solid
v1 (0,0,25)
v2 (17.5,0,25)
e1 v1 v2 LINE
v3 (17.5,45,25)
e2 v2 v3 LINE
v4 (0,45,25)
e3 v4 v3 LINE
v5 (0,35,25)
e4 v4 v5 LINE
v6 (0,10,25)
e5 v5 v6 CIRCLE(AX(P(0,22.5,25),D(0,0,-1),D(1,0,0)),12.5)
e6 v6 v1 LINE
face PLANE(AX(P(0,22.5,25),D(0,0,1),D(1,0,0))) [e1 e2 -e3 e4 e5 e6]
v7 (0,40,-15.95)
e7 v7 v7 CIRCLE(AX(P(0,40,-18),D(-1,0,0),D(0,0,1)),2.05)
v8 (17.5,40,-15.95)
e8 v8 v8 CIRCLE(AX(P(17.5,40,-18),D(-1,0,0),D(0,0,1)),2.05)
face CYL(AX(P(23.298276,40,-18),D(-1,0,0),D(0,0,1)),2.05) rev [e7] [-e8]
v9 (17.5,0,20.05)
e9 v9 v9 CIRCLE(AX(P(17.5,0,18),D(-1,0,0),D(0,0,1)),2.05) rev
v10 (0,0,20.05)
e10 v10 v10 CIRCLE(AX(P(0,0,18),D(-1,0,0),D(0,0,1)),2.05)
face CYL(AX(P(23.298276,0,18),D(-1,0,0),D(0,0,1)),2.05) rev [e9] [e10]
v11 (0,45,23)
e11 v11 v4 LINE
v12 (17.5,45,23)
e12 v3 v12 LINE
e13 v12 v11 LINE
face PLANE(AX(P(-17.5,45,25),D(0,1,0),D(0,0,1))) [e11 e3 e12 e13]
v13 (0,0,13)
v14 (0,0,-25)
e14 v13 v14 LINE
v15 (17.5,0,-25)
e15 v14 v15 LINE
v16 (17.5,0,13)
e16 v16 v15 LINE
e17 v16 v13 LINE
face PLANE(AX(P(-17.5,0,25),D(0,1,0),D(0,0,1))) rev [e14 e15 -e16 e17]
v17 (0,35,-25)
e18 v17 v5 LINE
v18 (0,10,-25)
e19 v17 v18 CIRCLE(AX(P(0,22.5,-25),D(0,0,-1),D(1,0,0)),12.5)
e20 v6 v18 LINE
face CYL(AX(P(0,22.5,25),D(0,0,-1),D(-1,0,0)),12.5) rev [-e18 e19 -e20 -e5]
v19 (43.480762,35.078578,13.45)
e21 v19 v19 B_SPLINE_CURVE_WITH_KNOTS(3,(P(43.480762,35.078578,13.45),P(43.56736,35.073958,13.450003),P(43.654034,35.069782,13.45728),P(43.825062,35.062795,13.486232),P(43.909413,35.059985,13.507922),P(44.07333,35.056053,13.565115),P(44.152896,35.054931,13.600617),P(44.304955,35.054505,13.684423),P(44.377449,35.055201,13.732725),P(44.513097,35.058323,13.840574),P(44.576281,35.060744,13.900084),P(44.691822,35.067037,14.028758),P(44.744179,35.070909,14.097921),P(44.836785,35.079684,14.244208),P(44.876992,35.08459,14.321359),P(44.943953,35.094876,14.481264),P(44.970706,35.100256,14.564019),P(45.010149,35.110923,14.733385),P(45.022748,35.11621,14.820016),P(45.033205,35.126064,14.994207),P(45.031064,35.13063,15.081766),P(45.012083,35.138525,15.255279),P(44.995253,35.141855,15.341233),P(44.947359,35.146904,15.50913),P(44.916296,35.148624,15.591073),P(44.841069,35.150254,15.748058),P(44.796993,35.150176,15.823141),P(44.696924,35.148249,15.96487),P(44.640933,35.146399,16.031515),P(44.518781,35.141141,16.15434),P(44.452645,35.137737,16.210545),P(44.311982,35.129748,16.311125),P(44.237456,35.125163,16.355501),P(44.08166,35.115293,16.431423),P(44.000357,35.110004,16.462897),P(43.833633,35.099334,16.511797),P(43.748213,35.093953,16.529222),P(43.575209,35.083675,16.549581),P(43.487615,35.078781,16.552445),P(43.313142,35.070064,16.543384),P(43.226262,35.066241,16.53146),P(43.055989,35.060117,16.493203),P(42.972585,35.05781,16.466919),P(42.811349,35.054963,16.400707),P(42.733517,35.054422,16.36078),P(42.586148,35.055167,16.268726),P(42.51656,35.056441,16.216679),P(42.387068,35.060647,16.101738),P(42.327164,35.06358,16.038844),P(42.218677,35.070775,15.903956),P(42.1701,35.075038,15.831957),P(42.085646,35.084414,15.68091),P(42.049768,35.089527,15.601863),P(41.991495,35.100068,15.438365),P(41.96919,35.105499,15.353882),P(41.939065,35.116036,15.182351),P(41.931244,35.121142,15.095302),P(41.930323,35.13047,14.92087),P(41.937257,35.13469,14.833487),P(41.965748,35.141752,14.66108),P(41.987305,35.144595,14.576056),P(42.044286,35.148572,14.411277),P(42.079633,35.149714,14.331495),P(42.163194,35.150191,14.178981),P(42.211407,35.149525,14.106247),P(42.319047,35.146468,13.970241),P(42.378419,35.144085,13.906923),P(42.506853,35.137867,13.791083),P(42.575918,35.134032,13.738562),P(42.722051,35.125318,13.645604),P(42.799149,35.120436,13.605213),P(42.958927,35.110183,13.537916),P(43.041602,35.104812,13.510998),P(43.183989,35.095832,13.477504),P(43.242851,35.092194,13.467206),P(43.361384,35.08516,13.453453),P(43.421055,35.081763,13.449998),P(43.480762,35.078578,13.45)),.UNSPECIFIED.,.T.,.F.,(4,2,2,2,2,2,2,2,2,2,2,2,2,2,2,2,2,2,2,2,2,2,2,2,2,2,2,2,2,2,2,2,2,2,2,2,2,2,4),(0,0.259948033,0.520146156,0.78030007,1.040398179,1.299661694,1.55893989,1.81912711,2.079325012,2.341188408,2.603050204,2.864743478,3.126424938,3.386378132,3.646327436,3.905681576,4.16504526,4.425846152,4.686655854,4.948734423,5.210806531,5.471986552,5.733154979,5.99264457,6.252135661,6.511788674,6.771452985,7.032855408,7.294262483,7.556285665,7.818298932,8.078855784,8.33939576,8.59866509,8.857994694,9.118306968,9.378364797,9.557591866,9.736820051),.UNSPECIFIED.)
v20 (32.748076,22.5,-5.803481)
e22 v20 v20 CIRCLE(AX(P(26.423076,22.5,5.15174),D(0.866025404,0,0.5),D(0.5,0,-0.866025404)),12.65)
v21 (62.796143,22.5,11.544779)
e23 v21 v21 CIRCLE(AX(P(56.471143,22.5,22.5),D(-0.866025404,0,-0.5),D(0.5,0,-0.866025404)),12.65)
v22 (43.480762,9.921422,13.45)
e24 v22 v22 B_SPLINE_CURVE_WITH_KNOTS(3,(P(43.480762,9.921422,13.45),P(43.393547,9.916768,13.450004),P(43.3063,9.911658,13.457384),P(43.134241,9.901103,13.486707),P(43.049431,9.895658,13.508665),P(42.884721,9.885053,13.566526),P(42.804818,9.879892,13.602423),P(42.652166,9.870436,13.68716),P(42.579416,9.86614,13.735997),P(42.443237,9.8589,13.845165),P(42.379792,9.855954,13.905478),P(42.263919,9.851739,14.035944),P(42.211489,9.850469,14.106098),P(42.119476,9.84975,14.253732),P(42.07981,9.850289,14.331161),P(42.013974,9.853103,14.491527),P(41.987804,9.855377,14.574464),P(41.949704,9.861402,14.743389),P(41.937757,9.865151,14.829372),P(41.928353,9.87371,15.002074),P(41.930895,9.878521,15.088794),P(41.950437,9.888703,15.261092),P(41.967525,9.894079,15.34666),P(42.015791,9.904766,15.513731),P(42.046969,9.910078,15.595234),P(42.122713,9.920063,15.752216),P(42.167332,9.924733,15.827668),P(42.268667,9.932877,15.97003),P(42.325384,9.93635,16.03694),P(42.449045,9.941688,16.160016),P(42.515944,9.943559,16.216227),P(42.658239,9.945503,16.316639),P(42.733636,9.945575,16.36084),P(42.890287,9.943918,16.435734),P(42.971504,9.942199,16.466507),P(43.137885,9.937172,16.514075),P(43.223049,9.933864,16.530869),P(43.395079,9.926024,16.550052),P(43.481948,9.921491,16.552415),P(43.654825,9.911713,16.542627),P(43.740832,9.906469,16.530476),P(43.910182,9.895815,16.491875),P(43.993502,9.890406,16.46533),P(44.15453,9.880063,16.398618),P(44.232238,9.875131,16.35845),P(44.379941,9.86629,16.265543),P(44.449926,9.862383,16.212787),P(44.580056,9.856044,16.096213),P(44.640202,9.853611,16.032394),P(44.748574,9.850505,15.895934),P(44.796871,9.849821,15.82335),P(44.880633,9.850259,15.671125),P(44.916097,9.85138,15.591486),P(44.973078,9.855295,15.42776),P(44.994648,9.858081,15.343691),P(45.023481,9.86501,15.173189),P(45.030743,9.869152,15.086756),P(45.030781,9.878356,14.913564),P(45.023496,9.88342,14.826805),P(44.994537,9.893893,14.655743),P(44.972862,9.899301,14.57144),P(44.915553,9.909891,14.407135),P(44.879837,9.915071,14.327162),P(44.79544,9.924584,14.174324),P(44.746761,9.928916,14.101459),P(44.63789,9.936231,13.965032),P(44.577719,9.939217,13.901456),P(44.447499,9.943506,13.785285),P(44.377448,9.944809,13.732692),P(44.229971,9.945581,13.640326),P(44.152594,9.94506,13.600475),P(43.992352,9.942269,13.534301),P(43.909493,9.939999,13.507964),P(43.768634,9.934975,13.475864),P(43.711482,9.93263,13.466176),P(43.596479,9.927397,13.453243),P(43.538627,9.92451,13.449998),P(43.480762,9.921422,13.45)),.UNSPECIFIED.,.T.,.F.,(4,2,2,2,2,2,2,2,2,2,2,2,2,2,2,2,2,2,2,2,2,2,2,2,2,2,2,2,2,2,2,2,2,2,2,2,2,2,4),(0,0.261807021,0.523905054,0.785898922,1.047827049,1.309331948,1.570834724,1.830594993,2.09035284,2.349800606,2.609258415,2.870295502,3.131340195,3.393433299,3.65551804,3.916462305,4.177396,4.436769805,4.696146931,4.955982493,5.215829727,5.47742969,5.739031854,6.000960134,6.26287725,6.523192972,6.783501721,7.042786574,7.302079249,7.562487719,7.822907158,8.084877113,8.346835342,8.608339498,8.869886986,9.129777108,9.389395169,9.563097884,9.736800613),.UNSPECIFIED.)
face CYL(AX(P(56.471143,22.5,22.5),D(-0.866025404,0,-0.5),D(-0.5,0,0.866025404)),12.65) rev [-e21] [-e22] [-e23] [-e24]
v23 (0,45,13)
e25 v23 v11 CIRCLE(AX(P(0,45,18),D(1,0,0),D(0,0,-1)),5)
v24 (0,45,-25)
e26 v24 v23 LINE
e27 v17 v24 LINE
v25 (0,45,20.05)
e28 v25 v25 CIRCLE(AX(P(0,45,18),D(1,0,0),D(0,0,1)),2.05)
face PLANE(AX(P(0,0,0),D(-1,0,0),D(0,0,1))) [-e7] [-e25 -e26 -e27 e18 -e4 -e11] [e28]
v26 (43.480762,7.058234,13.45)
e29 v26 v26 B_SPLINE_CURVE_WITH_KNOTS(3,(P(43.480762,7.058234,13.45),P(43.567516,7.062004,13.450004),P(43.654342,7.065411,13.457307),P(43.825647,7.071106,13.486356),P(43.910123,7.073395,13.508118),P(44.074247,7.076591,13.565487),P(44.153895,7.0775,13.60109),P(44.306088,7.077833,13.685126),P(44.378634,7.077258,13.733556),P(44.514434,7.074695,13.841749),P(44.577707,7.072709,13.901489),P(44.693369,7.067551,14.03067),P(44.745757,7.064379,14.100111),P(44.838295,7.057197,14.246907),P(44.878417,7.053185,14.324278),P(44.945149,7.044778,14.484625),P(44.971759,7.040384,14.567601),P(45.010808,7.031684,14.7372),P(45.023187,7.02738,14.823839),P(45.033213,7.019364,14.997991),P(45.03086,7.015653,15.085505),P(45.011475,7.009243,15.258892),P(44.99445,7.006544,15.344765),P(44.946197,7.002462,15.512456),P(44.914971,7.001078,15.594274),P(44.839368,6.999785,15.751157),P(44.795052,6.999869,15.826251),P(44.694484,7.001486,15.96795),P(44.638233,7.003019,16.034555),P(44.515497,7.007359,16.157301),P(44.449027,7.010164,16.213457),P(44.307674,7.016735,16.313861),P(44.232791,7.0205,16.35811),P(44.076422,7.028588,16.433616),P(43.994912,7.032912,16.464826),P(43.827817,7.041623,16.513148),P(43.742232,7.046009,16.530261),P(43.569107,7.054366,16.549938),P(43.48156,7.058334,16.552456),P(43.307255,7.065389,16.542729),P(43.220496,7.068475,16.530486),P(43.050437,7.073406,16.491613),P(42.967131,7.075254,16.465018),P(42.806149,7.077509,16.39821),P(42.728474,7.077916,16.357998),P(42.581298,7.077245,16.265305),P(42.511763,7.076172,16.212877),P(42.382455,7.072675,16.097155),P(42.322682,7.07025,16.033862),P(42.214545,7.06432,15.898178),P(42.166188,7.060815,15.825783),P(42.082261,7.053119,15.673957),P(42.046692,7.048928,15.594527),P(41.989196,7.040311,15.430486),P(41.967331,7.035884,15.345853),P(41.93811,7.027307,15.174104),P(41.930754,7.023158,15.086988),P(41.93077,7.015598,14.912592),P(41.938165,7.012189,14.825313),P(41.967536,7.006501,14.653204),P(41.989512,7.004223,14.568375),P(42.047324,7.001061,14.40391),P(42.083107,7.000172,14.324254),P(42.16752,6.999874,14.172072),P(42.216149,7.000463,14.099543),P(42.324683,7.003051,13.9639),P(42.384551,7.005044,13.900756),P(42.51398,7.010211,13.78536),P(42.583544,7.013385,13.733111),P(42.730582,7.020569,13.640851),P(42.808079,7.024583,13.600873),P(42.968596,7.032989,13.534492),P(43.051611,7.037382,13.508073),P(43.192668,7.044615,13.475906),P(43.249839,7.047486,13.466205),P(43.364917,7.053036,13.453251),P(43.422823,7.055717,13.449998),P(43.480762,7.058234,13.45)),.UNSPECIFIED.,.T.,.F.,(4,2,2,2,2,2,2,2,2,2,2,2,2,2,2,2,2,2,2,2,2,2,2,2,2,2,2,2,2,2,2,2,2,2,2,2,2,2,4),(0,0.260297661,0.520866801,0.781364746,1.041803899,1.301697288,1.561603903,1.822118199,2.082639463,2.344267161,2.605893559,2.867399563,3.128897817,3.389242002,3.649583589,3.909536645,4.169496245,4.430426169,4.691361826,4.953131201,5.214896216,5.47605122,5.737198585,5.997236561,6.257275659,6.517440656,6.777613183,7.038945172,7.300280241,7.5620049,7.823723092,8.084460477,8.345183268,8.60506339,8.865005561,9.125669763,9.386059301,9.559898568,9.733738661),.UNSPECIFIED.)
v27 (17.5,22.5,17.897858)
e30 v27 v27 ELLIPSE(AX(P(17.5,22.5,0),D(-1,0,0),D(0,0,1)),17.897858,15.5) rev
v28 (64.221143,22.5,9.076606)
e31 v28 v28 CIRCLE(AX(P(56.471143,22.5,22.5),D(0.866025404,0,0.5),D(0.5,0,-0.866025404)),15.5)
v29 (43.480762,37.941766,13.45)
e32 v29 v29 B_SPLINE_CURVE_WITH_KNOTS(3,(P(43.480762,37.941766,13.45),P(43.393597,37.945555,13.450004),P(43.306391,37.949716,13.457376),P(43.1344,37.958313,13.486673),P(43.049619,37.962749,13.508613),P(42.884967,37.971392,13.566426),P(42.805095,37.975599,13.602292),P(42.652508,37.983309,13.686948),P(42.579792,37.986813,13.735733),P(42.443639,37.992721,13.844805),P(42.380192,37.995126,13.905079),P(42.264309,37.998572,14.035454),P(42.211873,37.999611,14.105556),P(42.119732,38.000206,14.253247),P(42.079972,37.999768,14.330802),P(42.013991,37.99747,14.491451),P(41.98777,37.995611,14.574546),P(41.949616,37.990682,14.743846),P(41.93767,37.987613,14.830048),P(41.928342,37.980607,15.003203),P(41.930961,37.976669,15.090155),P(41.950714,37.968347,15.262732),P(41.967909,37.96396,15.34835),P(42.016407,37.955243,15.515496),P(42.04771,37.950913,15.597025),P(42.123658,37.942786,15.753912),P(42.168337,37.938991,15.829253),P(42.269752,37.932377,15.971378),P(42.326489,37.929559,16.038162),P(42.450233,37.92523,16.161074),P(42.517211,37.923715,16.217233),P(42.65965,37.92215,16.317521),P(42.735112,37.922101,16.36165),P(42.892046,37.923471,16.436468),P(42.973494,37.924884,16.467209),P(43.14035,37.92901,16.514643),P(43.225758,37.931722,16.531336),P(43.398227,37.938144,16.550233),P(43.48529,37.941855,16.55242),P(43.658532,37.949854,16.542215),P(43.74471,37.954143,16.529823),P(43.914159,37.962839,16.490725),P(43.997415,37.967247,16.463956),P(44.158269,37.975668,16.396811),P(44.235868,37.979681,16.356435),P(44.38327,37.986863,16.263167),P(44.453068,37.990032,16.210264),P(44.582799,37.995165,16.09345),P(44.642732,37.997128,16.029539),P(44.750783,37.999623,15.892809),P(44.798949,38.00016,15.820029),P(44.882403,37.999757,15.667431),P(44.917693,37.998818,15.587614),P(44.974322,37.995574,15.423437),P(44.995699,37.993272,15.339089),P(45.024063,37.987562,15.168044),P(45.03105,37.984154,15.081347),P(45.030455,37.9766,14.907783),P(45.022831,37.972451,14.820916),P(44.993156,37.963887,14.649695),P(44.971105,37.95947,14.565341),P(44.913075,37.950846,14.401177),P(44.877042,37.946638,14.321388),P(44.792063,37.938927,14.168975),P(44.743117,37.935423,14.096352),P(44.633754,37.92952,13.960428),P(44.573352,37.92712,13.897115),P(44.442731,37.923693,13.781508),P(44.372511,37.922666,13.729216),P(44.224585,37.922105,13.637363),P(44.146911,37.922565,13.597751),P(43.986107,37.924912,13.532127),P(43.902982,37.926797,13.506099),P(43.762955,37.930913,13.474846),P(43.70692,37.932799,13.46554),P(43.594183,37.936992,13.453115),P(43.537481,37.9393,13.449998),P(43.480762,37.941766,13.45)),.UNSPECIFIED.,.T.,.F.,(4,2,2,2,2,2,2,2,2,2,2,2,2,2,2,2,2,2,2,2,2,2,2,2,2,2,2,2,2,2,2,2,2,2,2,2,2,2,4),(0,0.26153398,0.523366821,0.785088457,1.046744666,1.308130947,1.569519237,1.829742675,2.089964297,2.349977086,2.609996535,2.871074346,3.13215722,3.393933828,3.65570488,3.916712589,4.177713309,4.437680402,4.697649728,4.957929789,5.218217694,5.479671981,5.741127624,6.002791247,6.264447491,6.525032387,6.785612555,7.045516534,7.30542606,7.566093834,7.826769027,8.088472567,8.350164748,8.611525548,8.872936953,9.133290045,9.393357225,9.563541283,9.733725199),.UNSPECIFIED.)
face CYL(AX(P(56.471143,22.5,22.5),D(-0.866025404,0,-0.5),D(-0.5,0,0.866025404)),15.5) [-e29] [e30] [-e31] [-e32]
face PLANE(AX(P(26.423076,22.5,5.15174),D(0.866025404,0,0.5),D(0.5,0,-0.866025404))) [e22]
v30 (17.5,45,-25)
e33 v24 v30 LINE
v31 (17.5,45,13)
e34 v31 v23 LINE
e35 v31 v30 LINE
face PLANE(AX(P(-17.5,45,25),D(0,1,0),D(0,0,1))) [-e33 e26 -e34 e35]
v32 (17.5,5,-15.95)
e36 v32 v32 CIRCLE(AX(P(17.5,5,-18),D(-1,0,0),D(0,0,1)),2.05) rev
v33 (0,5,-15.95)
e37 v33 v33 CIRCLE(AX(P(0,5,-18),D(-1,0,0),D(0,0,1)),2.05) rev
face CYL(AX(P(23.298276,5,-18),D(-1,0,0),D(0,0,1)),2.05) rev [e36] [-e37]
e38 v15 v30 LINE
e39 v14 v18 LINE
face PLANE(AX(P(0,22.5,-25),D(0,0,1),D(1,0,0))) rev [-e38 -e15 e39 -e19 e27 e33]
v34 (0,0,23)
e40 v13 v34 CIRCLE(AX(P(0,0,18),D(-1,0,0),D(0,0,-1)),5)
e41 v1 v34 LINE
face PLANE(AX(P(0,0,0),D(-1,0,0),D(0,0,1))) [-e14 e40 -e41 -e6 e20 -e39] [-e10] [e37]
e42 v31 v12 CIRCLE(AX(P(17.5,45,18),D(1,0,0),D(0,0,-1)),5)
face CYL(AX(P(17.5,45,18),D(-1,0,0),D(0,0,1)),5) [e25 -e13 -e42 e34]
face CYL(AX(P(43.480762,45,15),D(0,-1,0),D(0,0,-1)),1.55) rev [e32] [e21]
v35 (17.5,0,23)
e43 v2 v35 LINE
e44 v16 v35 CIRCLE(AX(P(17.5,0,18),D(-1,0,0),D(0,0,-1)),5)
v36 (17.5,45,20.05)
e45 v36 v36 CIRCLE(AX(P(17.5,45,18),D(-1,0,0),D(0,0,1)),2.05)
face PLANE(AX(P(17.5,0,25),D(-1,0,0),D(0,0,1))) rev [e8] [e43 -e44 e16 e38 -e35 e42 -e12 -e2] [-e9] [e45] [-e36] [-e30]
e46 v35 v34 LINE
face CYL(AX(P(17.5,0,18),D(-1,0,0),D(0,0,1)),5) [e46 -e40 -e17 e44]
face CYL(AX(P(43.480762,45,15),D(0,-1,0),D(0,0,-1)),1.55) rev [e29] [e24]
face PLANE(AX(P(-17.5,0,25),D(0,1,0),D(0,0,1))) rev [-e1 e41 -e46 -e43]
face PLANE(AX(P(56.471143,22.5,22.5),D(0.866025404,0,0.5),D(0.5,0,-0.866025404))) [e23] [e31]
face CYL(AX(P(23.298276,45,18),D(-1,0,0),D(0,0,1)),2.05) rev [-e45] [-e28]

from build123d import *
from build123d.topology import SkipClean

# Parameters (mm, degrees)
BOSS_EXTRUDE1_DEPTH             = 25
BOSS_EXTRUDE2_REACH             = 65.362
BOSS_EXTRUDE2_DIRECTION_2_DEPTH = 30
SKETCH9_R                       = 2.05
CUT_EXTRUDE3_DEPTH              = 35
BOSS_EXTRUDE5_REACH             = 62.896
SKETCH13_R                      = 1.55
CUT_EXTRUDE4_DEPTH              = 87.254538717
SKETCH16_W                      = 50
SKETCH16_H                      = 45
CUT_EXTRUDE5_DEPTH              = 17.5
BOSS_EXTRUDE6_DEPTH             = 17.5
SKETCH20_R                      = 2.05
CUT_EXTRUDE6_DEPTH              = 17.5


with BuildPart() as part:
    # Sketch1 → Boss-Extrude1 (new, symmetric)
    with BuildSketch(Plane.XY):
        with BuildLine():
            Line((-17.5, 22.5), (-17.5, 0))
            Line((-17.5, 0), (17.5, 0))
            Line((17.5, 0), (17.5, 22.5))
            Line((17.5, 22.5), (12.5, 22.5))
            ThreePointArc((12.5, 22.5), (0, 10), (-12.5, 22.5))
            Line((-12.5, 22.5), (-17.5, 22.5))
        make_face()
    boss_extrude1 = extrude(amount=BOSS_EXTRUDE1_DEPTH, both=True)

    # Boss-Extrude2: up to this face of the body (flat: up to its plane)
    boss_extrude2_end = Plane(part.part.faces().sort_by_distance((17.5, 11.25, 0))[0])
    # Sketch5 → Boss-Extrude2 (add, up to the picked face)
    with BuildSketch(Plane(origin=(26.115381057, 0, 15.077722283), x_dir=(0.500000000000001, 0, -0.8660254037844382), z_dir=(0.8660254037844382, 0, 0.500000000000001)), mode=Mode.PRIVATE) as boss_extrude2_sk1:
        with BuildLine():
            Line((-6.75, 22.5), (-3.9, 22.5))
            ThreePointArc((-3.9, 22.5), (8.75, 9.85), (21.4, 22.5))
            Line((21.4, 22.5), (24.25, 22.5))
            ThreePointArc((24.25, 22.5), (8.75, 7), (-6.75, 22.5))
        make_face()
    boss_extrude2_tool1 = split(extrude(boss_extrude2_sk1.sketch, amount=-BOSS_EXTRUDE2_REACH, mode=Mode.PRIVATE), bisect_by=boss_extrude2_end, keep=Keep.BOTH, mode=Mode.PRIVATE)
    boss_extrude2 = boss_extrude2_tool1.solids().sort_by(Axis((23.452881, 22.153409, 19.689308), (-0.8660254037844382, 0, -0.500000000000001)))[0]
    add(boss_extrude2)

    # Sketch5 → Boss-Extrude2 direction 2 (add)
    with BuildSketch(Plane(origin=(26.115381057, 0, 15.077722283), x_dir=(0.500000000000001, 0, -0.8660254037844382), z_dir=(0.8660254037844382, 0, 0.500000000000001))):
        with BuildLine():
            Line((-6.75, 22.5), (-3.9, 22.5))
            ThreePointArc((-3.9, 22.5), (8.75, 9.85), (21.4, 22.5))
            Line((21.4, 22.5), (24.25, 22.5))
            ThreePointArc((24.25, 22.5), (8.75, 7), (-6.75, 22.5))
        make_face()
    boss_extrude2_direction_2 = extrude(amount=BOSS_EXTRUDE2_DIRECTION_2_DEPTH)

    # Sketch9 → Cut-Extrude3 (cut)
    with BuildSketch(Plane.ZY.offset(17.5)):
        with Locations((-18, 5)):
            Circle(SKETCH9_R)
    cut_extrude3 = extrude(amount=-CUT_EXTRUDE3_DEPTH, mode=Mode.SUBTRACT)

    # Boss-Extrude5: up to this face of the body (flat: up to its plane)
    boss_extrude5_end = Plane(part.part.faces().sort_by_distance((17.5, 17.131173253, 0))[0])
    # Sketch12 → Boss-Extrude5 (add, up to the picked face)
    with BuildSketch(Plane(origin=(22.048076211, 0, 12.729462736), x_dir=(0.4999999999999999, 0, -0.8660254037844388), z_dir=(0.8660254037844388, 0, 0.4999999999999999)), mode=Mode.PRIVATE) as boss_extrude5_sk1:
        with BuildLine():
            Line((-3.9, 22.5), (21.4, 22.5))
            ThreePointArc((21.4, 22.5), (8.75, 9.85), (-3.9, 22.5))
        make_face()
    boss_extrude5_tool1 = split(extrude(boss_extrude5_sk1.sketch, amount=-BOSS_EXTRUDE5_REACH, mode=Mode.PRIVATE), bisect_by=boss_extrude5_end, keep=Keep.BOTH, mode=Mode.PRIVATE)
    boss_extrude5 = boss_extrude5_tool1.solids().sort_by(Axis((26.423076, 17.131173, 5.15174), (-0.8660254037844388, 0, -0.4999999999999999)))[0]
    add(boss_extrude5)

    # Mirror1: Boss-Extrude1, Boss-Extrude2, Boss-Extrude2 direction 2, Cut-Extrude3, Boss-Extrude5 across plane
    with SkipClean():  # the faces are left unmerged after this step: merging them gives an invalid solid
        add(boss_extrude1.mirror(Plane(origin=(17.5, 22.5, 25), x_dir=(0, 0, 1), z_dir=(0, -1, 0))))
        add(boss_extrude2.mirror(Plane(origin=(17.5, 22.5, 25), x_dir=(0, 0, 1), z_dir=(0, -1, 0))))
        add(boss_extrude2_direction_2.mirror(Plane(origin=(17.5, 22.5, 25), x_dir=(0, 0, 1), z_dir=(0, -1, 0))))
        add(cut_extrude3.mirror(Plane(origin=(17.5, 22.5, 25), x_dir=(0, 0, 1), z_dir=(0, -1, 0))), mode=Mode.SUBTRACT)
        add(boss_extrude5.mirror(Plane(origin=(17.5, 22.5, 25), x_dir=(0, 0, 1), z_dir=(0, -1, 0))))

    # Sketch13 → Cut-Extrude4 (cut, through all)
    with SkipClean():  # the faces are left unmerged after this step: merging them gives an invalid solid
        with BuildSketch(Plane(origin=(0, 0, 0), x_dir=(1, 0, 0), z_dir=(0, 1, 0))):
            with Locations(Location((43.480762114, -15, 0), (0, 0, 90))):
                Circle(SKETCH13_R)
        extrude(amount=CUT_EXTRUDE4_DEPTH, mode=Mode.SUBTRACT)

    # Sketch16 → Cut-Extrude5 (cut)
    with SkipClean():  # the faces are left unmerged after this step: merging them gives an invalid solid
        with BuildSketch(Plane(origin=(0, 0, 0), x_dir=(0, 0, -1), z_dir=(1, 0, 0))):
            with Locations((0, 22.5)):
                Rectangle(SKETCH16_W, SKETCH16_H)
        extrude(amount=-CUT_EXTRUDE5_DEPTH, mode=Mode.SUBTRACT)
    add(part.part.scale(1), mode=Mode.REPLACE)  # the faces are merged on a copy

    # Sketch18 → Boss-Extrude6 (add)
    with BuildSketch(Plane.ZY):
        with BuildLine():
            Line((13, 0), (23, 0))
            ThreePointArc((23, 0), (18, -5), (13, 0))
        make_face()
    boss_extrude6 = extrude(amount=-BOSS_EXTRUDE6_DEPTH)

    # Sketch20 → Cut-Extrude6 (cut)
    with BuildSketch(Plane.ZY):
        with Locations((18, 0)):
            Circle(SKETCH20_R)
    cut_extrude6 = extrude(amount=-CUT_EXTRUDE6_DEPTH, mode=Mode.SUBTRACT)

    # Mirror2: Boss-Extrude6, Cut-Extrude6 across plane
    add(boss_extrude6.mirror(Plane.ZX.offset(22.5)))
    add(cut_extrude6.mirror(Plane.ZX.offset(22.5)), mode=Mode.SUBTRACT)


solid = part.part
